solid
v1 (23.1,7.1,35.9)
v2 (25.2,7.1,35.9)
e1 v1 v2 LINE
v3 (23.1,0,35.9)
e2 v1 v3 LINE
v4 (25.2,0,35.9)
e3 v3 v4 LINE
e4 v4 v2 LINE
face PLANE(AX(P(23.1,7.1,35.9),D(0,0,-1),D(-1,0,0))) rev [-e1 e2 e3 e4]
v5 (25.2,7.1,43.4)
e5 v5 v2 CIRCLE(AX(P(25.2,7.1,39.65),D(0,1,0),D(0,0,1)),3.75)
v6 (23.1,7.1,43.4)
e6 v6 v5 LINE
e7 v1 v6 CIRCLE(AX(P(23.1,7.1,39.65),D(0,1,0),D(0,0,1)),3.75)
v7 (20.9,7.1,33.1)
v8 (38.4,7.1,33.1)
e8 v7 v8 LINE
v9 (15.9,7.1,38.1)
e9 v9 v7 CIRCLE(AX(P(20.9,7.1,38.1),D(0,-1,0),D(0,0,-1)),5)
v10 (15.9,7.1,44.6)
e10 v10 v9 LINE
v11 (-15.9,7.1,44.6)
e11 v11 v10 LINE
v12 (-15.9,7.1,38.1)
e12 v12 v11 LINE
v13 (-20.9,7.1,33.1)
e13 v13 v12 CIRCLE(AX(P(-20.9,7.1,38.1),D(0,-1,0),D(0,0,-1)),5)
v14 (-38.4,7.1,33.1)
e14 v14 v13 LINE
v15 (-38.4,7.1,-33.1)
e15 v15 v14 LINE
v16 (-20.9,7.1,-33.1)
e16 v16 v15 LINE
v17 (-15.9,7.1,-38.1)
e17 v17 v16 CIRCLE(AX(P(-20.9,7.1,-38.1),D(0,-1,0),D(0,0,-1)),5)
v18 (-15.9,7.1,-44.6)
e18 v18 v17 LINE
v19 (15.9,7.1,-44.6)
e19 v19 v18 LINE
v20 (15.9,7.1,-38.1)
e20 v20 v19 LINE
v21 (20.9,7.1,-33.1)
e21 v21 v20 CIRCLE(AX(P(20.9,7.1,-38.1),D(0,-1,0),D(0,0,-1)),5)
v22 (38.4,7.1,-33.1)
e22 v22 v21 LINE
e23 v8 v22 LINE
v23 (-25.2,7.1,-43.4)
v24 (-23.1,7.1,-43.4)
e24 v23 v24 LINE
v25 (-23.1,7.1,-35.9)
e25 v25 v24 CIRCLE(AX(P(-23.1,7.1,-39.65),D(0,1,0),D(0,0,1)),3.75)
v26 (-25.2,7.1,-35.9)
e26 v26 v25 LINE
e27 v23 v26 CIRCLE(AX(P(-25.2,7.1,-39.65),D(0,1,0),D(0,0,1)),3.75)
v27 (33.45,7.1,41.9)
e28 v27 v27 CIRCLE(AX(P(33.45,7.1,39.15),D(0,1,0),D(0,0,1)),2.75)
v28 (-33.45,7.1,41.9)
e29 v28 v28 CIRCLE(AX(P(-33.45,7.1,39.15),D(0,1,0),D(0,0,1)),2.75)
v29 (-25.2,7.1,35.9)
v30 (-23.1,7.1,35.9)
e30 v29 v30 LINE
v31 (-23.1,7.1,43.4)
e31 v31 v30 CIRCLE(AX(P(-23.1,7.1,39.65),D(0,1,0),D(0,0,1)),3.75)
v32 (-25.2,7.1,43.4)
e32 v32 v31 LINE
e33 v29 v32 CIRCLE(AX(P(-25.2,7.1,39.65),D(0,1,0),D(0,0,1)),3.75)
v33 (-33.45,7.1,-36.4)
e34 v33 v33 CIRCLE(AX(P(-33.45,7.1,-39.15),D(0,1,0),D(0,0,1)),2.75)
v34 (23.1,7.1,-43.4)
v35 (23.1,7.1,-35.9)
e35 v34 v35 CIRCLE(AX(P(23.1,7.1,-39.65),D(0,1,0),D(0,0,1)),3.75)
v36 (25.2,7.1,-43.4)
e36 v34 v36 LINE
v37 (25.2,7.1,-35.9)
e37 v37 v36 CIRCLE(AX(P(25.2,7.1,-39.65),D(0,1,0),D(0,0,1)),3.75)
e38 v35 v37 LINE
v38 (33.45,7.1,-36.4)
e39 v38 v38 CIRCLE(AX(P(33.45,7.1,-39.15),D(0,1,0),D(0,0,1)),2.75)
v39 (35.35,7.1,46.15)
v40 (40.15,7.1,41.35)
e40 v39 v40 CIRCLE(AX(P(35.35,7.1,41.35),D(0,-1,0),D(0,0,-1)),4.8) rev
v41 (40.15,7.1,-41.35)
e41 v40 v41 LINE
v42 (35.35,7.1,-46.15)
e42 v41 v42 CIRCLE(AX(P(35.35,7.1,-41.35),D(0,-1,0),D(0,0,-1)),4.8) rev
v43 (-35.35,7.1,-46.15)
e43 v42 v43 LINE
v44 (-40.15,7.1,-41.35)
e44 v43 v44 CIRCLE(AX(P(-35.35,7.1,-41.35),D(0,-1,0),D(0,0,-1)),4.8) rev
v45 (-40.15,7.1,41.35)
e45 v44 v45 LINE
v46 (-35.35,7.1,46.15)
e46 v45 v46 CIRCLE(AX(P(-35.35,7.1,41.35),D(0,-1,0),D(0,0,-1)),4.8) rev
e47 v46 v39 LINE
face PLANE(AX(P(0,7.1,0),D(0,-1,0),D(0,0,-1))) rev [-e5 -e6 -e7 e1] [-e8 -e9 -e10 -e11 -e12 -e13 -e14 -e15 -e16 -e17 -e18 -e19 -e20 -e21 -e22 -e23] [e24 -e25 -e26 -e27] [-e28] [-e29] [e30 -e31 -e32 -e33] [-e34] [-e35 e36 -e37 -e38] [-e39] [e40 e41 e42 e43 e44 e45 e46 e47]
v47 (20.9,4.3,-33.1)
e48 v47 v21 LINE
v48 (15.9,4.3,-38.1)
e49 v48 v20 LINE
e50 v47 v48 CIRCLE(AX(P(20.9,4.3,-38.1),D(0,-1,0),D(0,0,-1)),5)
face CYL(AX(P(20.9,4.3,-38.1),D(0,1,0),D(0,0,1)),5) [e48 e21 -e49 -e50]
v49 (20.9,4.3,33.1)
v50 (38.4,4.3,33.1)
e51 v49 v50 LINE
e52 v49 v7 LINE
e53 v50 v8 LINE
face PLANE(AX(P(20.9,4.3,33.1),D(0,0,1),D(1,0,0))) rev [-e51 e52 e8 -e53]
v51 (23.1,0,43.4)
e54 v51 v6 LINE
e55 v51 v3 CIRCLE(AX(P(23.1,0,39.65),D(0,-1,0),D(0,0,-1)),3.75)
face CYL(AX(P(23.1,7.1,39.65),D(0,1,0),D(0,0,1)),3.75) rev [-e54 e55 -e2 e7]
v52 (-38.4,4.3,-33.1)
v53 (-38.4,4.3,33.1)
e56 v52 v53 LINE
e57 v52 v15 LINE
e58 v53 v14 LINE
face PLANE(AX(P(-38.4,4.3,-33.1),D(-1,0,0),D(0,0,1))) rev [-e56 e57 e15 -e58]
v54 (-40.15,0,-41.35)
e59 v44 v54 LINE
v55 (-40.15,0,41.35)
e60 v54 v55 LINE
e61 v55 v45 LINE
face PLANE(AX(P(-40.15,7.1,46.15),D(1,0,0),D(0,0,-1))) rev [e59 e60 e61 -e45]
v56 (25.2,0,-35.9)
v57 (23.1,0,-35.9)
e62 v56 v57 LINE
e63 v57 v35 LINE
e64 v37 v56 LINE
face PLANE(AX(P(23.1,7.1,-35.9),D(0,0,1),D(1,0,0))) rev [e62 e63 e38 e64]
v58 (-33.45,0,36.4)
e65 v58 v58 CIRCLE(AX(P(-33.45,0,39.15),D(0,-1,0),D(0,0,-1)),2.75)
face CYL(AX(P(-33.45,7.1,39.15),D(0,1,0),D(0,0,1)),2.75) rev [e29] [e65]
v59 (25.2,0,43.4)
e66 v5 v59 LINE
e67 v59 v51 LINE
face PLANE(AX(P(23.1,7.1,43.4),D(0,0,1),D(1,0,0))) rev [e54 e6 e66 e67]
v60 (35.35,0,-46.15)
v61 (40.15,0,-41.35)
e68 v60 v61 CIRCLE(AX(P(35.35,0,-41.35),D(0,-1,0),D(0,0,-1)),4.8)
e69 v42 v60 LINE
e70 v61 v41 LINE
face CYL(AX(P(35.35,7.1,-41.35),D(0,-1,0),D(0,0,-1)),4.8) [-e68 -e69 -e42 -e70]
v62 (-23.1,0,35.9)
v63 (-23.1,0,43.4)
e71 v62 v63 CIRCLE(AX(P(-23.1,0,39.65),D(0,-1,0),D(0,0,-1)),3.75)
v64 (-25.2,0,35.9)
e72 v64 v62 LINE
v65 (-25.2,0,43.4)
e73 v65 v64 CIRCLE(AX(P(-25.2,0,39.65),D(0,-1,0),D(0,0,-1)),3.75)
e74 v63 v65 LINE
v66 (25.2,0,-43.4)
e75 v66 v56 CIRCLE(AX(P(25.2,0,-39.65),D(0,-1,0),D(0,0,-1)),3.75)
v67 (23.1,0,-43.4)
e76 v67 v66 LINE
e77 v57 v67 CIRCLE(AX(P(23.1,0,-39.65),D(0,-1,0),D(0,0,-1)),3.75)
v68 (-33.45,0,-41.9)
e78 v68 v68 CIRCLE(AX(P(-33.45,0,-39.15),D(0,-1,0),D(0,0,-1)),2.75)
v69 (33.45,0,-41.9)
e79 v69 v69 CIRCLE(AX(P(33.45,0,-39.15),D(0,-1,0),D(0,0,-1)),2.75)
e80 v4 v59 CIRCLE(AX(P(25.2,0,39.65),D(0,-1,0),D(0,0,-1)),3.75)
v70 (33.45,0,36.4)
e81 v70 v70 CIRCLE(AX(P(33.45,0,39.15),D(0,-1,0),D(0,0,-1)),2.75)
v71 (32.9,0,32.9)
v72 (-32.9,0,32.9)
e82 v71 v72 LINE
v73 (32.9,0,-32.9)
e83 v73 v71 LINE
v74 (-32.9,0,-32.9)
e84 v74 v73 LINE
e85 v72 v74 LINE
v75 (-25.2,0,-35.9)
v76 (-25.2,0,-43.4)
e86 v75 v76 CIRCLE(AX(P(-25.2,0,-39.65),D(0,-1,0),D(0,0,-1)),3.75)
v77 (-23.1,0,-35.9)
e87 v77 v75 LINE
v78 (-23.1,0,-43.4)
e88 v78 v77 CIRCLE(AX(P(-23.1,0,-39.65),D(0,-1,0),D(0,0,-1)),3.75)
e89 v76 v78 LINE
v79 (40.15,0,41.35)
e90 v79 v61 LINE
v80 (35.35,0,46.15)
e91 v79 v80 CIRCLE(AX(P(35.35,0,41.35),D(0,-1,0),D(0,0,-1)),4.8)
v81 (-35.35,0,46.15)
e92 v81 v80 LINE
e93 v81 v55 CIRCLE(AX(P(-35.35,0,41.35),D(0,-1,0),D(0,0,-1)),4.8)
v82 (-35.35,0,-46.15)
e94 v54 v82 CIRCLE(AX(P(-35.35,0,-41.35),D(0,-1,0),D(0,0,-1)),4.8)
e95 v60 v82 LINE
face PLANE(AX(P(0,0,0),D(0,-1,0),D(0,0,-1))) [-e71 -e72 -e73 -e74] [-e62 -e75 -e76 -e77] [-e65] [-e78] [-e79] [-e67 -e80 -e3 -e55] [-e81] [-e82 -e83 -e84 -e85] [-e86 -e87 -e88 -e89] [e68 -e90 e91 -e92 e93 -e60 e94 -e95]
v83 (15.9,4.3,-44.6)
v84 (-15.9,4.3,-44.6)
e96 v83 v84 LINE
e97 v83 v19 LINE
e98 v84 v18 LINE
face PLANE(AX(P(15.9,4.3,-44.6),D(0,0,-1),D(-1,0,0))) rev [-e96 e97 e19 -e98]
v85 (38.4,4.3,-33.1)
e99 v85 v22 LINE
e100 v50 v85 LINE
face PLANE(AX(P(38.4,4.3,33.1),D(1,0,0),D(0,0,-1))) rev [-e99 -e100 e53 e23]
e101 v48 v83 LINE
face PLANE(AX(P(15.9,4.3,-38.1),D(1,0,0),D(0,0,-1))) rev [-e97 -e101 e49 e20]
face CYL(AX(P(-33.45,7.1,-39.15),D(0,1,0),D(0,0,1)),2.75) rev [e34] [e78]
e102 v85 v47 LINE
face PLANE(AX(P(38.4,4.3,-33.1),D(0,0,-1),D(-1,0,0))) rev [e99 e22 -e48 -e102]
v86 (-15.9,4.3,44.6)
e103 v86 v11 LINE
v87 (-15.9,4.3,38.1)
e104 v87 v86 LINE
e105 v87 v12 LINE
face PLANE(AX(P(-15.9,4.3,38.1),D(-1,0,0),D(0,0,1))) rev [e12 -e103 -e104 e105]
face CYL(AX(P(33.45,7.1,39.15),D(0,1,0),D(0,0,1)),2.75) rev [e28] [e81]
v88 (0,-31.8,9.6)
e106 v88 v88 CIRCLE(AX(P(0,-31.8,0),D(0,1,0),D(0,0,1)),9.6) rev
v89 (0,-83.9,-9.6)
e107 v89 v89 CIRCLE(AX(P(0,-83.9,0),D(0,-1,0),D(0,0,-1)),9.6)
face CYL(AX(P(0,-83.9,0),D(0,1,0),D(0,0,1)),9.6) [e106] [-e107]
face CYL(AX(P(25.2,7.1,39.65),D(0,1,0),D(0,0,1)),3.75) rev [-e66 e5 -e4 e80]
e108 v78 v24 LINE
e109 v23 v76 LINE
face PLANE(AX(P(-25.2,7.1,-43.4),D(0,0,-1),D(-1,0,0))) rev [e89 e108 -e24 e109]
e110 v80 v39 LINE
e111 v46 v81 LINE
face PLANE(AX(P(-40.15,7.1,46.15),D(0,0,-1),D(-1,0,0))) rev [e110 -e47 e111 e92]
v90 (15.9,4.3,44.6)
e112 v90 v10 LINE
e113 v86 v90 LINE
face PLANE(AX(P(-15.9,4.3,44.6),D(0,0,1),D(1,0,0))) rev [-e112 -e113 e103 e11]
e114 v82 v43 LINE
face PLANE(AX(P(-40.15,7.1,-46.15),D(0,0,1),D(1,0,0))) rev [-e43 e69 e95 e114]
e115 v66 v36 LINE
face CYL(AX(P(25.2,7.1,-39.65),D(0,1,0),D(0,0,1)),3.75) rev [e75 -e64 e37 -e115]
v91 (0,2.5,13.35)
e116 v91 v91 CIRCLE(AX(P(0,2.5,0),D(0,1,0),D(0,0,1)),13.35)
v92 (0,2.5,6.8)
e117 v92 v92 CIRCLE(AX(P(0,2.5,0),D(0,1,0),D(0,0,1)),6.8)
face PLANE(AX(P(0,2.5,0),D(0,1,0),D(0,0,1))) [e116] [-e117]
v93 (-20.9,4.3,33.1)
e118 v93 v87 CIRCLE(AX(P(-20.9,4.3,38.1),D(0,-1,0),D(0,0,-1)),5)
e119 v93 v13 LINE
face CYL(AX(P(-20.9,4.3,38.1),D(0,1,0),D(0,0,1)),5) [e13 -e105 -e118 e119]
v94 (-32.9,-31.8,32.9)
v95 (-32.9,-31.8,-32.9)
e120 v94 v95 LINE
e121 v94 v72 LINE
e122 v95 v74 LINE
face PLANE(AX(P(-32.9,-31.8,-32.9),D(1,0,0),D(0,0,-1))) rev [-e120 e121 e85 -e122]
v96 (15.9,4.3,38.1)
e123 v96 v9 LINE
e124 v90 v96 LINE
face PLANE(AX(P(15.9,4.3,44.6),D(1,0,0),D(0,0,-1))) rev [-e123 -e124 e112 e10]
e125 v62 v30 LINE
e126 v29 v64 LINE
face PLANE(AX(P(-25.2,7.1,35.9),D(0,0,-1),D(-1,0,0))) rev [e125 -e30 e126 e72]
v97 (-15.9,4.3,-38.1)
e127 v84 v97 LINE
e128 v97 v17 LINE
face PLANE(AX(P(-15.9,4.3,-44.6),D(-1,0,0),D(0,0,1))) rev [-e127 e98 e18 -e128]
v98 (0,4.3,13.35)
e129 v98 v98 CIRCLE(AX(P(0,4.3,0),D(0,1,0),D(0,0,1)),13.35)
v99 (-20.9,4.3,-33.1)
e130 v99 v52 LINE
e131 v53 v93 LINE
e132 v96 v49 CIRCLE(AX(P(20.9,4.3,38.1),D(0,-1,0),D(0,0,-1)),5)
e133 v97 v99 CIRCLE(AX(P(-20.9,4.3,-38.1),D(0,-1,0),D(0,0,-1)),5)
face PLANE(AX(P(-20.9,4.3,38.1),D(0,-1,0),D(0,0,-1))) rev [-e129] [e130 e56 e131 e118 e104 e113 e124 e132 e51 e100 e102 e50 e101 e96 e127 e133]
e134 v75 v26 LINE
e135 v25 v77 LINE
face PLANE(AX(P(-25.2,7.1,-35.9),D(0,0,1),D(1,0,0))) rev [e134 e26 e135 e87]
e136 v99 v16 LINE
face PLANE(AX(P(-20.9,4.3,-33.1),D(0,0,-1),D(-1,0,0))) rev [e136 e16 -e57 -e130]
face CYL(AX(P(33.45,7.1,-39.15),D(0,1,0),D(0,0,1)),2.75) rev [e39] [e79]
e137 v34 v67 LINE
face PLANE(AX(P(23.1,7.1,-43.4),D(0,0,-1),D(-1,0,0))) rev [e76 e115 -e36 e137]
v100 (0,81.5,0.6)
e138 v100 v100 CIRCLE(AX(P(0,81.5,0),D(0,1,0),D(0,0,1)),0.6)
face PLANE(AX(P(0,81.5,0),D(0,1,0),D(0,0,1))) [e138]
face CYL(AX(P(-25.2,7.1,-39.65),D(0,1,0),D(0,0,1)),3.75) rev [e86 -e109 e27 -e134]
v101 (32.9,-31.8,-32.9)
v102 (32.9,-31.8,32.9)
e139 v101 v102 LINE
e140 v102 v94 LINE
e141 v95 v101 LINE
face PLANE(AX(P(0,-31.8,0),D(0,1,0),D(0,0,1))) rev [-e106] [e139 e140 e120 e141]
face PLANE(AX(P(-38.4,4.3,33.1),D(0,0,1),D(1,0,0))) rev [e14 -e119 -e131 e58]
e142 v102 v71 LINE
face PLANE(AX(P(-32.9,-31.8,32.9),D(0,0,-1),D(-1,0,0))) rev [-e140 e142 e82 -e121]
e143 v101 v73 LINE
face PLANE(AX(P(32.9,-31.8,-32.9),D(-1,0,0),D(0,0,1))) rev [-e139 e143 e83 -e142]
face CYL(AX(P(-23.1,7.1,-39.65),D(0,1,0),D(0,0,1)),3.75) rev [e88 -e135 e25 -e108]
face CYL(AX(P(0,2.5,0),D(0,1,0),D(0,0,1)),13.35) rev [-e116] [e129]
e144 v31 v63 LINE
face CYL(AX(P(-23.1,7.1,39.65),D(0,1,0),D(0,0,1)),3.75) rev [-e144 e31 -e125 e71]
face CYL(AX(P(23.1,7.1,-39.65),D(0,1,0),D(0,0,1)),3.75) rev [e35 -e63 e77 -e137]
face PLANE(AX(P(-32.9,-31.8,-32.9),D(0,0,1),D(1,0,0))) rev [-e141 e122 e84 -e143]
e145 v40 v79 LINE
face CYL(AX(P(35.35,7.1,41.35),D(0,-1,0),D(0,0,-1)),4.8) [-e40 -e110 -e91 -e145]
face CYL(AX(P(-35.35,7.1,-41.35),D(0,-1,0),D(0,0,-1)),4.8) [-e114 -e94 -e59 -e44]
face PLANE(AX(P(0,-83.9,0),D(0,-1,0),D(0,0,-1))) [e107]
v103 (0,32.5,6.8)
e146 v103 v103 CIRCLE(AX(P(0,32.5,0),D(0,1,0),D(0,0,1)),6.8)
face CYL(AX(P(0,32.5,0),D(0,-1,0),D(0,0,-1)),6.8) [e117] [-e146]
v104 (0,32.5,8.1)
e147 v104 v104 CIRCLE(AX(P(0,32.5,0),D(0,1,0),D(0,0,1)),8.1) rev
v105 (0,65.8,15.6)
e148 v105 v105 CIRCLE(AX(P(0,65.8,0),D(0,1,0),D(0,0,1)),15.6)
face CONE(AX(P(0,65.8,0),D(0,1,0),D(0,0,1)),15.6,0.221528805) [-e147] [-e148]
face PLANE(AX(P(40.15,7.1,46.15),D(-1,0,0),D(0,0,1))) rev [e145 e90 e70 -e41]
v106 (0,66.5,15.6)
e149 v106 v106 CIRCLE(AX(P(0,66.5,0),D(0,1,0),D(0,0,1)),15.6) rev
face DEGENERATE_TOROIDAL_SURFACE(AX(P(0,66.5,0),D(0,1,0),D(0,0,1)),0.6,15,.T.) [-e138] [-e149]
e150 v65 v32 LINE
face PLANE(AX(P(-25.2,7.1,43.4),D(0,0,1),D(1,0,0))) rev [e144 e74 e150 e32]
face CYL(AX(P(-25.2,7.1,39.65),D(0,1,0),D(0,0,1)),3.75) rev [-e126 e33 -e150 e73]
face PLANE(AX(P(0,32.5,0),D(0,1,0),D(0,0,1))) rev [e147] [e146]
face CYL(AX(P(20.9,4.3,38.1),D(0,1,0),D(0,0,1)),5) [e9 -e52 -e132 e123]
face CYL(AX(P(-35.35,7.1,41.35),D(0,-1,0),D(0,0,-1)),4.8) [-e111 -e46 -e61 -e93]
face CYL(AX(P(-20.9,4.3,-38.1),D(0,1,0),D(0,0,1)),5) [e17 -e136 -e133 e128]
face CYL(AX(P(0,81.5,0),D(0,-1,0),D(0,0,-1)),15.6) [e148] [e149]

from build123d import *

# Parameters (mm, degrees)
SKETCH1_W                = 80.3
SKETCH1_H                = 92.3
BOSS_EXTRUDE1_DEPTH      = 7.1
SKETCH2_W                = 65.8
SKETCH2_H                = 65.8
BOSS_EXTRUDE2_DEPTH      = 31.8
SKETCH3_R                = 9.6
BOSS_EXTRUDE3_DEPTH      = 52.1
CUT_EXTRUDE1_DEPTH       = 2.8
M5_CLEARANCE_SLOT1_D     = 5.5
FILLET1_R                = 4.8
M5_CLEARANCE_SLOT2_DEPTH = 7.1
SKETCH9_R                = 13.35
CUT_EXTRUDE2_DEPTH       = 1.8
SKETCH10_R               = 6.8
BOSS_EXTRUDE4_DEPTH      = 30
SKETCH11_R               = 15.6
BOSS_EXTRUDE5_DEPTH      = 49
FILLET2_R                = 15
CHAMFER1_SIZE            = 7.5
CHAMFER1_SIZE2           = 33.3


# Read off the part's stored shape, not the designer's step: M5 Clearance Slot2
with BuildPart() as part:
    # Sketch1 → Boss-Extrude1 (new body)
    with BuildSketch(Plane(origin=(0, 0, 0), x_dir=(1, 0, 0), z_dir=(0, 1, 0))):
        Rectangle(SKETCH1_W, SKETCH1_H)
    extrude(amount=BOSS_EXTRUDE1_DEPTH)

    # Sketch2 → Boss-Extrude2 (add)
    with BuildSketch(Plane.XZ):
        Rectangle(SKETCH2_W, SKETCH2_H)
    extrude(amount=BOSS_EXTRUDE2_DEPTH)

    # Sketch3 → Boss-Extrude3 (add)
    with BuildSketch(Plane.XZ.offset(31.8)):
        with Locations(Location((0, 0, 0), (0, 0, 90))):
            Circle(SKETCH3_R)
    extrude(amount=BOSS_EXTRUDE3_DEPTH)

    # Sketch4 → Cut-Extrude1 (cut)
    with BuildSketch(Plane(origin=(0, 7.1, 0), x_dir=(1, 0, 0), z_dir=(0, 1, 0))):
        with BuildLine():
            Line((-38.4, 33.1), (-38.4, -33.1))
            Line((-38.4, -33.1), (-20.9, -33.1))
            ThreePointArc((-20.9, -33.1), (-17.364466094, -34.564466094), (-15.9, -38.1))
            Line((-15.9, -38.1), (-15.9, -44.6))
            Line((-15.9, -44.6), (15.9, -44.6))
            Line((15.9, -44.6), (15.9, -38.1))
            ThreePointArc((15.9, -38.1), (17.364466094, -34.564466094), (20.9, -33.1))
            Line((20.9, -33.1), (38.4, -33.1))
            Line((38.4, -33.1), (38.4, 33.1))
            Line((38.4, 33.1), (20.9, 33.1))
            ThreePointArc((20.9, 33.1), (17.364466094, 34.564466094), (15.9, 38.1))
            Line((15.9, 38.1), (15.9, 44.6))
            Line((15.9, 44.6), (-15.9, 44.6))
            Line((-15.9, 44.6), (-15.9, 38.1))
            ThreePointArc((-15.9, 38.1), (-17.364466094, 34.564466094), (-20.9, 33.1))
            Line((-20.9, 33.1), (-38.4, 33.1))
        make_face()
    extrude(amount=-CUT_EXTRUDE1_DEPTH, mode=Mode.SUBTRACT)

    # M5 Clearance Slot1 (through all)
    with Locations(Plane(origin=(0, 7.1, 0), x_dir=(1, 0, 0), z_dir=(0, 1, 0))):
        with Locations((-33.45, 39.15), (33.45, 39.15), (33.45, -39.15), (-33.45, -39.15)):
            Hole(M5_CLEARANCE_SLOT1_D / 2)

    # Fillet1
    fillet1_edges = [part.edges().sort_by_distance(p)[0] for p in [
        (40.15, 3.55, 46.15),
        (-40.15, 3.55, 46.15),
        (-40.15, 3.55, -46.15),
        (40.15, 3.55, -46.15),
    ]]
    fillet(fillet1_edges, radius=FILLET1_R)

    # M5 Clearance Slot2 outline → M5 Clearance Slot2 (cut)
    with BuildSketch(Plane(origin=(0, 0, 0), x_dir=(1, 0, 0), z_dir=(0, 1, 0))):
        with BuildLine():
            Line((23.1, 35.9), (25.2, 35.9))
            ThreePointArc((25.2, 35.9), (28.95, 39.65), (25.2, 43.4))
            Line((25.2, 43.4), (23.1, 43.4))
            ThreePointArc((23.1, 43.4), (19.35, 39.65), (23.1, 35.9))
        make_face()
        with BuildLine():
            ThreePointArc((-23.1, 35.9), (-19.35, 39.65), (-23.1, 43.4))
            Line((-23.1, 43.4), (-25.2, 43.4))
            ThreePointArc((-25.2, 43.4), (-28.95, 39.65), (-25.2, 35.9))
            Line((-25.2, 35.9), (-23.1, 35.9))
        make_face()
        with BuildLine():
            Line((23.1, -43.4), (25.2, -43.4))
            ThreePointArc((25.2, -43.4), (28.95, -39.65), (25.2, -35.9))
            Line((25.2, -35.9), (23.1, -35.9))
            ThreePointArc((23.1, -35.9), (19.35, -39.65), (23.1, -43.4))
        make_face()
        with BuildLine():
            ThreePointArc((-23.1, -43.4), (-19.35, -39.65), (-23.1, -35.9))
            Line((-23.1, -35.9), (-25.2, -35.9))
            ThreePointArc((-25.2, -35.9), (-28.95, -39.65), (-25.2, -43.4))
            Line((-25.2, -43.4), (-23.1, -43.4))
        make_face()
    extrude(amount=M5_CLEARANCE_SLOT2_DEPTH, mode=Mode.SUBTRACT)

    # Sketch9 → Cut-Extrude2 (cut)
    with BuildSketch(Plane(origin=(0, 4.3, 0), x_dir=(1, 0, 0), z_dir=(0, 1, 0))):
        with Locations(Location((0, 0, 0), (0, 0, 270))):
            Circle(SKETCH9_R)
    extrude(amount=-CUT_EXTRUDE2_DEPTH, mode=Mode.SUBTRACT)

    # Sketch10 → Boss-Extrude4 (add)
    with BuildSketch(Plane(origin=(0, 2.5, 0), x_dir=(1, 0, 0), z_dir=(0, 1, 0))):
        with Locations(Location((0, 0, 0), (0, 0, 270))):
            Circle(SKETCH10_R)
    extrude(amount=BOSS_EXTRUDE4_DEPTH)

    # Sketch11 → Boss-Extrude5 (add)
    with BuildSketch(Plane(origin=(0, 32.5, 0), x_dir=(1, 0, 0), z_dir=(0, 1, 0))):
        with Locations(Location((0, 0, 0), (0, 0, 270))):
            Circle(SKETCH11_R)
    extrude(amount=BOSS_EXTRUDE5_DEPTH)

    # Fillet2
    fillet2_edges = [part.edges().sort_by_distance(p)[0] for p in [
        (0, 81.5, -15.6),
    ]]
    fillet(fillet2_edges, radius=FILLET2_R)

    # Chamfer1
    chamfer1_edges = [part.edges().sort_by_distance(p)[0] for p in [
        (0, 32.5, -15.6),
    ]]
    chamfer1_side = [part.faces().sort_by_distance(p)[0] for p in [
        (0, 32.5, -15.158765369),
    ]]
    chamfer(chamfer1_edges, length=CHAMFER1_SIZE, length2=CHAMFER1_SIZE2, reference=chamfer1_side[0])


solid = part.part
